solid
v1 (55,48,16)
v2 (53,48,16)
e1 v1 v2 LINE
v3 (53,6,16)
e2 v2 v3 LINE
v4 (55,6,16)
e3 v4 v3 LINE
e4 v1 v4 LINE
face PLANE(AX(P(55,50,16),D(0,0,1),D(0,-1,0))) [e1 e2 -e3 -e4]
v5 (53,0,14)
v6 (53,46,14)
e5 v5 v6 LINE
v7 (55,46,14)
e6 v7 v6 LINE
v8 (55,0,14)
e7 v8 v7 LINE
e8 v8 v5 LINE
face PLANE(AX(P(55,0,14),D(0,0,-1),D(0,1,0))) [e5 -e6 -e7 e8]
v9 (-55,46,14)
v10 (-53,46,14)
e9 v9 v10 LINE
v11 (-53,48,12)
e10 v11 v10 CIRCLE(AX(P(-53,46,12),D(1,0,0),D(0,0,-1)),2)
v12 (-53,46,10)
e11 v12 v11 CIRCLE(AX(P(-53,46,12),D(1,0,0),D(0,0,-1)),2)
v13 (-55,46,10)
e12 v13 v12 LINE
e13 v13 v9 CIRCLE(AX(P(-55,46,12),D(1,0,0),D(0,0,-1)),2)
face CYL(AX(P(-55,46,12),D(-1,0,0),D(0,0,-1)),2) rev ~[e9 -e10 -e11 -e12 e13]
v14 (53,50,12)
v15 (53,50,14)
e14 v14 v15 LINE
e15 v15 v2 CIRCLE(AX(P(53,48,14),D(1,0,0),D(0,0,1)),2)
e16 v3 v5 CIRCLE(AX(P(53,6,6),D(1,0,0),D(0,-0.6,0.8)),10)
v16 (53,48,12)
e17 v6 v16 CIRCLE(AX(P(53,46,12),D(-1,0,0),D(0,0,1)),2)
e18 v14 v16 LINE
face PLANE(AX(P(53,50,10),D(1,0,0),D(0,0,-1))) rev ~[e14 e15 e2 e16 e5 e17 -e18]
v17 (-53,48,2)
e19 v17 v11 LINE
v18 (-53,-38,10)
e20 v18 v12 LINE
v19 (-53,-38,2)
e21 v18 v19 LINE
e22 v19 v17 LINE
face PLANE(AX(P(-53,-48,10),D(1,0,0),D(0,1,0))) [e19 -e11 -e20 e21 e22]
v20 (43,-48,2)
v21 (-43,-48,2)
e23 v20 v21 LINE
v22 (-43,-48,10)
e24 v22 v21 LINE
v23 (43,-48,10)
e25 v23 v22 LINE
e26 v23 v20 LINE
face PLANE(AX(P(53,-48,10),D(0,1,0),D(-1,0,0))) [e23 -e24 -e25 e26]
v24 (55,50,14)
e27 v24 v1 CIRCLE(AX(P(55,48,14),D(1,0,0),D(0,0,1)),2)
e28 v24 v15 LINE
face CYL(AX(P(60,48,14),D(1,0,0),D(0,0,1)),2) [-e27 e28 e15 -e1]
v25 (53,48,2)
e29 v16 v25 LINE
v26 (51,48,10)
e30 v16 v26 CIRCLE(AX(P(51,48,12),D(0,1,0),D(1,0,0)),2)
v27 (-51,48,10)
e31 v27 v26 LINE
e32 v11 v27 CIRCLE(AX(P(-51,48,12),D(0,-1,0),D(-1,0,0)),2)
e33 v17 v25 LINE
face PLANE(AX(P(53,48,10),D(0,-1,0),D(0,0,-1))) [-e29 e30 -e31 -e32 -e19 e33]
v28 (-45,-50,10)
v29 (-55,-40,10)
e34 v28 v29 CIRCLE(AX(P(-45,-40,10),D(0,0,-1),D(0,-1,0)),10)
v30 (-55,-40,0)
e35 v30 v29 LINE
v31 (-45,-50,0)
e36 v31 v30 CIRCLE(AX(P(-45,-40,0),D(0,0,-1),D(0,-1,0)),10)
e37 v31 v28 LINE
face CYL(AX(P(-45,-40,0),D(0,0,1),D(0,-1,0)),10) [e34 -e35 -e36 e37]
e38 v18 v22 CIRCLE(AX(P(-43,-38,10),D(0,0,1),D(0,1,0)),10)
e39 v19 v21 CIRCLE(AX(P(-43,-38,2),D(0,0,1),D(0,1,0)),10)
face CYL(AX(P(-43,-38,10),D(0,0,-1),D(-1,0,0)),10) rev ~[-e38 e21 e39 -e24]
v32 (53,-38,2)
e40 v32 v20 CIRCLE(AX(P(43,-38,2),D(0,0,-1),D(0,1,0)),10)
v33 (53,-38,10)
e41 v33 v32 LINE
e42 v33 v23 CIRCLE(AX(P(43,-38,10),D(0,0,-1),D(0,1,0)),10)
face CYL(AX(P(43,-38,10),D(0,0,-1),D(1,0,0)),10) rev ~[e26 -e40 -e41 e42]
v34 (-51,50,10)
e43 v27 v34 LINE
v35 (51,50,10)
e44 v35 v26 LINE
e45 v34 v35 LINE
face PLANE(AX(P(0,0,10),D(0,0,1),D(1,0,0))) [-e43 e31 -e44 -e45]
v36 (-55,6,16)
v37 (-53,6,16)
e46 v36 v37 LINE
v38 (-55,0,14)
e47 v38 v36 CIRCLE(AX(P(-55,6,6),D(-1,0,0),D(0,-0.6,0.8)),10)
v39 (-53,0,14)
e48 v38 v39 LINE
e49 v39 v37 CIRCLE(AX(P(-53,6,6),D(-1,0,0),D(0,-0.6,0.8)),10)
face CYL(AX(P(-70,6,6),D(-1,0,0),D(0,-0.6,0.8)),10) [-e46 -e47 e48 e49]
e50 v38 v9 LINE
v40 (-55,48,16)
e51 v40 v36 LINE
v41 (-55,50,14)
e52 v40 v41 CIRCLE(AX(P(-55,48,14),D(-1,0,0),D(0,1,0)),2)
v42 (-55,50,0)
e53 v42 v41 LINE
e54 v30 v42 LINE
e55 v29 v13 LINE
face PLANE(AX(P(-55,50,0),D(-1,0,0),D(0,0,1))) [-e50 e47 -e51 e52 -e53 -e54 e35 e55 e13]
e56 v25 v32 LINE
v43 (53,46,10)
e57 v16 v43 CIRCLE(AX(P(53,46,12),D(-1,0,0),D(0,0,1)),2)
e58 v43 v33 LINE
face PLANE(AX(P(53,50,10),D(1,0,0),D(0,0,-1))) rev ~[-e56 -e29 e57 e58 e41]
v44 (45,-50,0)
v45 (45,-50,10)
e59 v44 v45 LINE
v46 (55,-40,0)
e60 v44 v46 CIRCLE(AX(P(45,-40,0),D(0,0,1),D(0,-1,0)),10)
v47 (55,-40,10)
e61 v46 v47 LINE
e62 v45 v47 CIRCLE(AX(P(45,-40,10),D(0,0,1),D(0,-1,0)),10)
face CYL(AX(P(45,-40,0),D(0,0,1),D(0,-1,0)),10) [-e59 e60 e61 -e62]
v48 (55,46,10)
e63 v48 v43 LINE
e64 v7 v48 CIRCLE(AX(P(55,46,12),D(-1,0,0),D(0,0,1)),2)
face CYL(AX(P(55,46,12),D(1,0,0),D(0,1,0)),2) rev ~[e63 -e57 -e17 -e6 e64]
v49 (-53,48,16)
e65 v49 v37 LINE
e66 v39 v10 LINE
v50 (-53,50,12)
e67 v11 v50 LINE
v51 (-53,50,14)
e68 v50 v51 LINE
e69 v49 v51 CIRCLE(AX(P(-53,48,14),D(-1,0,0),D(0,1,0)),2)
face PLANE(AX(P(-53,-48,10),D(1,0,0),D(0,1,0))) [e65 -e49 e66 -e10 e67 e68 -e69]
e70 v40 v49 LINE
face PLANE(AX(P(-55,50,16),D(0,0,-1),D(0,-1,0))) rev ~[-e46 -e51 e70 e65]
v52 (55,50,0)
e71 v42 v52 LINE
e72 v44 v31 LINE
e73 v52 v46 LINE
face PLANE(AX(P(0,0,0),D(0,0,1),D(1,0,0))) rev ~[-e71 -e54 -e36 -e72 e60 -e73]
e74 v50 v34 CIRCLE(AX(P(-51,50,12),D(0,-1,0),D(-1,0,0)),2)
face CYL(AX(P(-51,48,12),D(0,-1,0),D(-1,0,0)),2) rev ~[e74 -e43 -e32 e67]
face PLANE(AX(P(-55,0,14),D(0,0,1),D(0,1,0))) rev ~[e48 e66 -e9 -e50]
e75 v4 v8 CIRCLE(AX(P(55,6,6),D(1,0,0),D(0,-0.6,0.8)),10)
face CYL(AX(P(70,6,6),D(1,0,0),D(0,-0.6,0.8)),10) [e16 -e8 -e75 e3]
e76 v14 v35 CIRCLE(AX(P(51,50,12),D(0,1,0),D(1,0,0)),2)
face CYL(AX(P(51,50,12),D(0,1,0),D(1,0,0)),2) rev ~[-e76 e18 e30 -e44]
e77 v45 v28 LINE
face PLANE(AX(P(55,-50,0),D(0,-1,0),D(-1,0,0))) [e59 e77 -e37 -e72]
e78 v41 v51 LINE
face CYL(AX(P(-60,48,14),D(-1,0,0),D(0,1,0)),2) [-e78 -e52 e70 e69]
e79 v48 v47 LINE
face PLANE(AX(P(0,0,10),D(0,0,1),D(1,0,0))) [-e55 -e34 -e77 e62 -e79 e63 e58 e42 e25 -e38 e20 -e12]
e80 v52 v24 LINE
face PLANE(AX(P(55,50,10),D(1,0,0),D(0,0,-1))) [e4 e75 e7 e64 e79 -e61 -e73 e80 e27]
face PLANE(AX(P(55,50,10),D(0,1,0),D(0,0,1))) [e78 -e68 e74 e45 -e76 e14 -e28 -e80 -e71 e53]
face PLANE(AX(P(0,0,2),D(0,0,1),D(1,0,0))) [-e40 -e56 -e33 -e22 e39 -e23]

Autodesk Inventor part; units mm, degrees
ref_plane "YZ Plane" through (0, 0, 0) normal (1, 0, 0) x (0, 1, 0)
ref_plane "XZ Plane" through (0, 0, 0) normal (0, 1, 0) x (-1, 0, 0)
ref_plane "XY Plane" through (0, 0, 0) normal (0, 0, 1) x (1, 0, 0)
sketch "Sketch1" plane through (0, 0, 0) normal (0, 0, 1) x (1, 0, 0)
  line L0 (55, -50) -> (-55, -50)
  line L1 (-55, -50) -> (-55, 50)
  line L2 (-55, 50) -> (55, 50)
  line L3 (55, 50) -> (55, -50)
  line L4 (55, -50) -> (-55, 50) construction
  line L5 (-55, -50) -> (55, 50) construction
  point P0 (0, 0)
  dimension "d0" = 110
  dimension "d1" = 100
extrude "Extrusion1" add sketch "Sketch1" along normal blind 10
sketch "Sketch2" plane through (0, 0, 10) normal (0, 0, 1) x (1, 0, 0)
  line L0 (53, -48) -> (-53, -48)
  line L1 (-53, -48) -> (-53, 48)
  line L2 (-53, 48) -> (53, 48)
  line L3 (53, 48) -> (53, -48)
  line L4 (53, -48) -> (-53, 48) construction
  line L5 (-53, -48) -> (53, 48) construction
  point P0 (0, 0)
  dimension "d4" = 106
  dimension "d5" = 96
extrude "Extrusion2" cut sketch "Sketch2" against normal blind 8
fillet "Fillet1" radius 10 4 edges at (-55, -50, 5) (-53, -48, 6) (55, -50, 5) (53, -48, 6)
sketch "Sketch3" plane through (-55, 50, 0) normal (-1, 0, 0) x (0, 0, 1)
  line L0 (0, 0) -> (10, 0) projected
  line L1 (10, 0) -> (16, 0)
  line L2 (16, 0) -> (16, -50)
  line L3 (16, -50) -> (14, -50)
  line L4 (14, -50) -> (14, -2)
  line L5 (14, -2) -> (10, -2)
  line L6 (10, -90) -> (10, 0) projected
  point P0 (0, -50)
  dimension "d9" = 50
  dimension "d10" = 6
  dimension "d11" = 4
  dimension "d12" = 2
extrude "Extrusion3" add sketch "Sketch3" against normal blind 2
sketch "Sketch4" plane through (55, 50, 10) normal (1, 0, 0) x (0, 0, -1)
  line L0 (10, 0) -> (0, 0) projected
  line L1 (10, 0) -> (-6, 0) projected
  line L2 (0, 0) -> (-6, 0)
  line L3 (-6, 0) -> (-6, -50) projected
  line L4 (-6, 0) -> (-6, -50)
  line L5 (-6, -50) -> (-4, -50) projected
  line L6 (-6, -50) -> (-4, -50)
  line L7 (-4, -50) -> (-4, -2) projected
  line L8 (-4, -50) -> (-4, -2)
  line L9 (-4, -2) -> (0, -2)
  line L10 (0, -90) -> (0, 0) projected
  point P0 (10, -50)
extrude "Extrusion4" add sketch "Sketch4" against normal blind 2
fillet "Fillet2" radius 10 2 edges at (-54, 0, 16) (54, 0, 16)
fillet "Fillet3" radius 2 8 edges at (-54, 50, 16) (54, 50, 16) (-54, 48, 14) (54, 48, 14) (54, 48, 10) (-54, 48, 10) (-53, 49, 10) (53, 49, 10)
properties part number "backpack"
